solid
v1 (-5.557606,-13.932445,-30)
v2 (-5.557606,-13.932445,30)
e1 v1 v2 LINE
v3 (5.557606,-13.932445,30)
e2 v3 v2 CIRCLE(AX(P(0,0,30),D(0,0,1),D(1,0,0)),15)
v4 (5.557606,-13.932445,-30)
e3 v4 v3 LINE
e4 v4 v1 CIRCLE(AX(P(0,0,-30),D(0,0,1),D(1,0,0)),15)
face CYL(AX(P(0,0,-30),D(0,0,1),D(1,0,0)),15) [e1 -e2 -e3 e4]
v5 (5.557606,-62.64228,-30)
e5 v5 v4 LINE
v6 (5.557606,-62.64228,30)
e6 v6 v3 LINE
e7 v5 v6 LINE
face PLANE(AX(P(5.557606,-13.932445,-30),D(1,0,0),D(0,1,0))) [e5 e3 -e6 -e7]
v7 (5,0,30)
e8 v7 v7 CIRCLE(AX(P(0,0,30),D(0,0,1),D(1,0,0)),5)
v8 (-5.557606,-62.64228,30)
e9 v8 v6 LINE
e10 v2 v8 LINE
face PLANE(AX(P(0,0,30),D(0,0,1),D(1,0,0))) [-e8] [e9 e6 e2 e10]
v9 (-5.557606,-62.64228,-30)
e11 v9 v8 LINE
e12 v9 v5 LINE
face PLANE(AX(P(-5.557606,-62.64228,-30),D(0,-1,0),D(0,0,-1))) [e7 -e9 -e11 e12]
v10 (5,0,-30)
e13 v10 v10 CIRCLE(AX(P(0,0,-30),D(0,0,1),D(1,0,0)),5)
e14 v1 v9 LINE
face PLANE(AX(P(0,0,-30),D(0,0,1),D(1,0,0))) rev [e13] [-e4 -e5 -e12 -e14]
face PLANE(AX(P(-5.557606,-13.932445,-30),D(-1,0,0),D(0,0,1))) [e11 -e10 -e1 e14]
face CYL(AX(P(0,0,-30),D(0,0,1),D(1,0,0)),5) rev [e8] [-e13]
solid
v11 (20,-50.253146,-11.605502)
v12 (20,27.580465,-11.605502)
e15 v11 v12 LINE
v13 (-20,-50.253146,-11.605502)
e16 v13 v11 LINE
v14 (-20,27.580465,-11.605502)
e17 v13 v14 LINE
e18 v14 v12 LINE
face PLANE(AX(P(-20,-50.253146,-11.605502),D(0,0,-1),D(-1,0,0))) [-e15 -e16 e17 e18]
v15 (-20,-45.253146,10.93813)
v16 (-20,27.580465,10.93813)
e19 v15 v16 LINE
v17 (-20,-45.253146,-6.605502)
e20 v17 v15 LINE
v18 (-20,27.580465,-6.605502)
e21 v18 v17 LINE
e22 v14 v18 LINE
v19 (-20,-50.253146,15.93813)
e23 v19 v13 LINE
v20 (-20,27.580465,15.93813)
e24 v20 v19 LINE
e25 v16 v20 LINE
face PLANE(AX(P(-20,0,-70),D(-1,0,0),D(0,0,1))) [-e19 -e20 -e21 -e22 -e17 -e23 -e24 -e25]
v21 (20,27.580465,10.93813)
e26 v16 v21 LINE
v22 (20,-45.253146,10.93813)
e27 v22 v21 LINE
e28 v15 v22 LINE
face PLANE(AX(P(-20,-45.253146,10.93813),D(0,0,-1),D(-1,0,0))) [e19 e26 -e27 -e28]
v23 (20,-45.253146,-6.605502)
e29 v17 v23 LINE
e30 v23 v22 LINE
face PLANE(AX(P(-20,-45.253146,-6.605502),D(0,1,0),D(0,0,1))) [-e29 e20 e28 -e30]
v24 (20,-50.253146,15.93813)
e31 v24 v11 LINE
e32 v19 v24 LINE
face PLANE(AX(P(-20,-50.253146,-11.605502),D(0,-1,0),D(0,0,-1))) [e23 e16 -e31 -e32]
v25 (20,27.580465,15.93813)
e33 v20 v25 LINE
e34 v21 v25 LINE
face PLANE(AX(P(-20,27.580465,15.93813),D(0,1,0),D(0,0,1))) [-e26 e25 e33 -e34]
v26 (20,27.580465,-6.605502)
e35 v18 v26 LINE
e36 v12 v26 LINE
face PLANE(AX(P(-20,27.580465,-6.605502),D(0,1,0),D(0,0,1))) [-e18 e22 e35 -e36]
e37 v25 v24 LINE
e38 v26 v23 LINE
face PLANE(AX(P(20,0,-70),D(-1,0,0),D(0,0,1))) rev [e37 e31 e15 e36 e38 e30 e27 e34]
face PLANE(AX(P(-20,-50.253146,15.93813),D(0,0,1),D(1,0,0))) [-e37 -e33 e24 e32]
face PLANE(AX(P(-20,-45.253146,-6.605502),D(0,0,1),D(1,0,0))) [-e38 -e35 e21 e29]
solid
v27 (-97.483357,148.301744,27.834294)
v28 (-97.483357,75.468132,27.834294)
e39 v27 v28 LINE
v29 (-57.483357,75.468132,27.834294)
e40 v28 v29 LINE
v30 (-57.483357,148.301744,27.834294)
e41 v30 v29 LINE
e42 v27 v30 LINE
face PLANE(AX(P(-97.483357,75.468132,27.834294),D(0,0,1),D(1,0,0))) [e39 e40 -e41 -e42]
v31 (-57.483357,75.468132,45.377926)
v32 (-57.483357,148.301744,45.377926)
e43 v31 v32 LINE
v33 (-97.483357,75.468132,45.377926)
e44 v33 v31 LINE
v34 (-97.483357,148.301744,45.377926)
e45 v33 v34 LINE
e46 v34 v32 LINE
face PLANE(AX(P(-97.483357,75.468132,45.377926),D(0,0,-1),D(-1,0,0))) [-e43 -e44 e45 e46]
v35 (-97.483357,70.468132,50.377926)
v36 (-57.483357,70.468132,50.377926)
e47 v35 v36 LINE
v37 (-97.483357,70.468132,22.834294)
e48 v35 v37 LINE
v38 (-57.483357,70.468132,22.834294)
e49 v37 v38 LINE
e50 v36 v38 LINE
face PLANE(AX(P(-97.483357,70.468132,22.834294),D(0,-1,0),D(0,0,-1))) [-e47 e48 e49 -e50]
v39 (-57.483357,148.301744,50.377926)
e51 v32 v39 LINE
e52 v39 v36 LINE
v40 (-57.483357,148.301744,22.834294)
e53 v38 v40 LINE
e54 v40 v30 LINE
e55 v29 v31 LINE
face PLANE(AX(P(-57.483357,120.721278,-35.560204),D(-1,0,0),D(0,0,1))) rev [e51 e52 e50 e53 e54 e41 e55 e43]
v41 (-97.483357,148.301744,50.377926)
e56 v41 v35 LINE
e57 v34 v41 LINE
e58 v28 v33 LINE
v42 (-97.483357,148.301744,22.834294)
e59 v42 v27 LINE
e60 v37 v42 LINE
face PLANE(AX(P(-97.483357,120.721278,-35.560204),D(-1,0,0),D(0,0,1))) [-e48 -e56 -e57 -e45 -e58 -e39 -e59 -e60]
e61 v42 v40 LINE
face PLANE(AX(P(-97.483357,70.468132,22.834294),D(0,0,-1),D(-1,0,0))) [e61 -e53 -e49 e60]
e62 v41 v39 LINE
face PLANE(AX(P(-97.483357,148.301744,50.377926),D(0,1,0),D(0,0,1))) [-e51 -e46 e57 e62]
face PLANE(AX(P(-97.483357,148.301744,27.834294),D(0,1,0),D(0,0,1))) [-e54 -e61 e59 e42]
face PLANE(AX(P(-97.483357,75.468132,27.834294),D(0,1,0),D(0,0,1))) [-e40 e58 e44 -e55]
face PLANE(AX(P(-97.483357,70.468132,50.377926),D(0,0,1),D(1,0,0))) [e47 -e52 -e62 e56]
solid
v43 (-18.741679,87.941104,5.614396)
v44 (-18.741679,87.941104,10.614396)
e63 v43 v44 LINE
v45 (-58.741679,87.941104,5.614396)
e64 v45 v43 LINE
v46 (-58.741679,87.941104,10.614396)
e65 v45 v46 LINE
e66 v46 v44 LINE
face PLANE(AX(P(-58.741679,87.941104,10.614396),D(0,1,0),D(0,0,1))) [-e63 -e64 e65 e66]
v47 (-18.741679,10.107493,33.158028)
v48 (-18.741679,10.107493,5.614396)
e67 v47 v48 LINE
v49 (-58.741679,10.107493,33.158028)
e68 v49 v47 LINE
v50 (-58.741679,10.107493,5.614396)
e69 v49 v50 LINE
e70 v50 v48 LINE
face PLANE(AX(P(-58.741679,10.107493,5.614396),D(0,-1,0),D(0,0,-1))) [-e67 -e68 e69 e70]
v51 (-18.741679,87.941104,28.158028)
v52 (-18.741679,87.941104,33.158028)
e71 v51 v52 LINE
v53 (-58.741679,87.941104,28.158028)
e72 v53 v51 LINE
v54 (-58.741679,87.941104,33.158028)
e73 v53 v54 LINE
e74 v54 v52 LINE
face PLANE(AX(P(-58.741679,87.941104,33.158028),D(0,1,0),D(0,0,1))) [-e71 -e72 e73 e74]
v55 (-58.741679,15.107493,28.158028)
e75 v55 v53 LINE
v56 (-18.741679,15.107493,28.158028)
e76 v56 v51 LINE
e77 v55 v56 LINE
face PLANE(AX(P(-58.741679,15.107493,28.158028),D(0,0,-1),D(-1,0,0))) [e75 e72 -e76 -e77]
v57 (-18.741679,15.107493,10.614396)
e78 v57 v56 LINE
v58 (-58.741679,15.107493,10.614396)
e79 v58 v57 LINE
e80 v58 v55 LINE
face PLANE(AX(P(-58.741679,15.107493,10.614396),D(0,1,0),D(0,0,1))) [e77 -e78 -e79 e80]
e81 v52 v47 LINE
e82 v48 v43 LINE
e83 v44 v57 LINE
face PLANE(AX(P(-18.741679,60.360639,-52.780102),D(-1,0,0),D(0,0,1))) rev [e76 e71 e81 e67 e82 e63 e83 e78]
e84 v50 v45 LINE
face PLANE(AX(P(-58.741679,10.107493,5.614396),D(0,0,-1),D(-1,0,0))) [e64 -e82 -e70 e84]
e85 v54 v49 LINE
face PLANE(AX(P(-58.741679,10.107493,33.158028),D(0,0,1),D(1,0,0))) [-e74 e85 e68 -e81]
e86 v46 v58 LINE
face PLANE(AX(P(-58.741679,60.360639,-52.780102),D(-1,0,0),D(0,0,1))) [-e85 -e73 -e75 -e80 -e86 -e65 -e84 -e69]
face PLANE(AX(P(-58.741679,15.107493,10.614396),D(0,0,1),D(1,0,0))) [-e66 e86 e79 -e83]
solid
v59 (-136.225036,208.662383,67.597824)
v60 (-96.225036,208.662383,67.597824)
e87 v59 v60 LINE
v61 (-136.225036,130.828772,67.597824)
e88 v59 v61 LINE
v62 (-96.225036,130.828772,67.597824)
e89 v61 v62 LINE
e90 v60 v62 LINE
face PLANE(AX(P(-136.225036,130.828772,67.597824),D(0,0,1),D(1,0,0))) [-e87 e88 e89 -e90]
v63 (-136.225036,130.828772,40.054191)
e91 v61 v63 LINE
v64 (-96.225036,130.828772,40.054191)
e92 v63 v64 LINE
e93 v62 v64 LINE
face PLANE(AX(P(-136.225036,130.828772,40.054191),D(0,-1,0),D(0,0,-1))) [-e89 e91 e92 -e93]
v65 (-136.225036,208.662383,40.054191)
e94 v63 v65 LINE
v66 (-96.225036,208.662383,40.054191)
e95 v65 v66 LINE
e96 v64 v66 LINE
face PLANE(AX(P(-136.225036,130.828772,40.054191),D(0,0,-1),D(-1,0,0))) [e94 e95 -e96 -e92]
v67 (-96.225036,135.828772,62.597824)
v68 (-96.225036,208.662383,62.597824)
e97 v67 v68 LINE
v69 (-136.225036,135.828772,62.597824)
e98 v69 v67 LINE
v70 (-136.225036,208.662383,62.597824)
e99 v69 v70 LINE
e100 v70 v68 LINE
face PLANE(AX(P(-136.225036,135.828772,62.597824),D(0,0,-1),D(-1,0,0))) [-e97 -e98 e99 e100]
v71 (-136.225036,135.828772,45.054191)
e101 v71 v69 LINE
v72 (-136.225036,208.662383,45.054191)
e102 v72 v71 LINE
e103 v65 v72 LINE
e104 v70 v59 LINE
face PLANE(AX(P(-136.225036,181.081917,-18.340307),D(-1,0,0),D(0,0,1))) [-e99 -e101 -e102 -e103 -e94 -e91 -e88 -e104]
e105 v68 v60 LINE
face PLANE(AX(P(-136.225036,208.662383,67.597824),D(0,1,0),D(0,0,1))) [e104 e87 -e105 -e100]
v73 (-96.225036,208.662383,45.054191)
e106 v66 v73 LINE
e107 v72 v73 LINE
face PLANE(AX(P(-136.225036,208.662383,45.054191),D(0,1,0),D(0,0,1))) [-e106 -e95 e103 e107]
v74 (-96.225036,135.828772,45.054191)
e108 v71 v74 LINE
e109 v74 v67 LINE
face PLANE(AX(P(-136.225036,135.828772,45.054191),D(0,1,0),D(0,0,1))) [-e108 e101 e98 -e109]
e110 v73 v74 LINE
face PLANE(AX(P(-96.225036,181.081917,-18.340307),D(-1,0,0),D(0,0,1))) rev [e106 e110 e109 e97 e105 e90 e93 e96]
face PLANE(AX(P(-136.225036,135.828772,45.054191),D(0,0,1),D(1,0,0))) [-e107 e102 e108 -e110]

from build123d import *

# Parameters (mm, degrees)
EXTRUDE_5_DEPTH         = 30
EXTRUDE_5_DEPTH_BACK    = 30
F_1_FR_R                = 5
EXTRUDE_6_DEPTH         = 20
EXTRUDE_6_DEPTH_BACK    = 20
MOVE_START              = 130.828771523
MOVE_BODY_2_OUTLINE_W   = 40
MOVE_BODY_2_OUTLINE_H   = 5
MOVE_BODY_2_DEPTH       = 77.833611116
MOVE_BODY_2_2_OUTLINE_W = 40
MOVE_BODY_2_2_OUTLINE_H = 17.543632218
MOVE_BODY_2_2_DEPTH     = 5
MOVE_START_2            = 70.468132412
MOVE_BODY_2_3_OUTLINE_W = 40
MOVE_BODY_2_3_OUTLINE_H = 5
MOVE_BODY_2_3_DEPTH     = 77.833611116
MOVE_BODY_2_4_OUTLINE_W = 40
MOVE_BODY_2_4_OUTLINE_H = 17.543632219
MOVE_BODY_2_4_DEPTH     = 5
MOVE_START_3            = 10.107493301
MOVE_BODY_2_5_OUTLINE_W = 40
MOVE_BODY_2_5_OUTLINE_H = 5
MOVE_BODY_2_5_DEPTH     = 77.833611116
MOVE_BODY_2_6_OUTLINE_W = 40
MOVE_BODY_2_6_OUTLINE_H = 17.543632218
MOVE_BODY_2_6_DEPTH     = 5


# Read off the part's stored shape, not the designer's step: Тело-Переместить/Копировать2
with BuildPart() as part:
    # Эскиз1_fr → Бобышка-Вытянуть5 (new, two sides: drawn at the far end of the back side and taken through both)
    with BuildSketch(Plane.XY.offset(-EXTRUDE_5_DEPTH_BACK)):
        with BuildLine():
            Line((-5.557606452, -13.932444528), (-5.557606452, -62.642280008))
            Line((-5.557606452, -62.642280008), (5.557606452, -62.642280008))
            Line((5.557606452, -62.642280008), (5.557606452, -13.932444528))
            ThreePointArc((5.557606452, -13.932444528), (0, 15), (-5.557606452, -13.932444528))
        make_face()
        Circle(F_1_FR_R, mode=Mode.SUBTRACT)
    extrude(amount=EXTRUDE_5_DEPTH + EXTRUDE_5_DEPTH_BACK)


with BuildPart() as body_2:
    # Эскиз3 → Бобышка-Вытянуть6 (new, two sides: drawn at the far end of the back side and taken through both)
    with BuildSketch(Plane(origin=(0, 0, 0), x_dir=(0, 0, -1), z_dir=(1, 0, 0)).offset(-EXTRUDE_6_DEPTH_BACK)):
        Polygon((-58.394498043, -50.25314581), (-85.938130262, -50.25314581), (-85.938130262, 27.580465306), (-80.938130262, 27.580465306), (-80.938130262, -45.25314581), (-63.394498043, -45.25314581), (-63.394498043, 27.580465306), (-58.394498043, 27.580465306), align=None)
    extrude(amount=EXTRUDE_6_DEPTH + EXTRUDE_6_DEPTH_BACK)


with BuildPart() as body_2_1:
    # Move Body 1: moved
    add(body_2.part.moved(Location((0, 0, -70))))


with BuildPart() as body_3:
    # Move Body 2 outline → Move Body 2 (new body)
    with BuildSketch(Plane(origin=(0, 0, 0), x_dir=(1, 0, 0), z_dir=(0, 1, 0)).offset(MOVE_START)):
        with Locations((-116.225036109, -42.554191316)):
            Rectangle(MOVE_BODY_2_OUTLINE_W, MOVE_BODY_2_OUTLINE_H)
        with Locations((-116.225036109, -65.097823534)):
            Rectangle(MOVE_BODY_2_OUTLINE_W, MOVE_BODY_2_OUTLINE_H)
    extrude(amount=MOVE_BODY_2_DEPTH)

    # Move Body 2 2 outline → Move Body 2 2 (add)
    with BuildSketch(Plane(origin=(0, 0, 0), x_dir=(1, 0, 0), z_dir=(0, 1, 0)).offset(MOVE_START)):
        with Locations((-116.225036109, -53.826007425)):
            Rectangle(MOVE_BODY_2_2_OUTLINE_W, MOVE_BODY_2_2_OUTLINE_H)
    extrude(amount=MOVE_BODY_2_2_DEPTH)


with BuildPart() as body_4:
    # Move Body 2 3 outline → Move Body 2 3 (new body)
    with BuildSketch(Plane(origin=(0, 0, 0), x_dir=(1, 0, 0), z_dir=(0, 1, 0)).offset(MOVE_START_2)):
        with Locations((-77.483357406, -25.334293558)):
            Rectangle(MOVE_BODY_2_3_OUTLINE_W, MOVE_BODY_2_3_OUTLINE_H)
        with Locations((-77.483357406, -47.877925777)):
            Rectangle(MOVE_BODY_2_3_OUTLINE_W, MOVE_BODY_2_3_OUTLINE_H)
    extrude(amount=MOVE_BODY_2_3_DEPTH)

    # Move Body 2 4 outline → Move Body 2 4 (add)
    with BuildSketch(Plane(origin=(0, 0, 0), x_dir=(1, 0, 0), z_dir=(0, 1, 0)).offset(MOVE_START_2)):
        with Locations((-77.483357406, -36.606109668)):
            Rectangle(MOVE_BODY_2_4_OUTLINE_W, MOVE_BODY_2_4_OUTLINE_H)
    extrude(amount=MOVE_BODY_2_4_DEPTH)


with BuildPart() as body_5:
    # Move Body 2 5 outline → Move Body 2 5 (new body)
    with BuildSketch(Plane(origin=(0, 0, 0), x_dir=(1, 0, 0), z_dir=(0, 1, 0)).offset(MOVE_START_3)):
        with Locations((-38.741678703, -8.114395801)):
            Rectangle(MOVE_BODY_2_5_OUTLINE_W, MOVE_BODY_2_5_OUTLINE_H)
        with Locations((-38.741678703, -30.658028019)):
            Rectangle(MOVE_BODY_2_5_OUTLINE_W, MOVE_BODY_2_5_OUTLINE_H)
    extrude(amount=MOVE_BODY_2_5_DEPTH)

    # Move Body 2 6 outline → Move Body 2 6 (add)
    with BuildSketch(Plane(origin=(0, 0, 0), x_dir=(1, 0, 0), z_dir=(0, 1, 0)).offset(MOVE_START_3)):
        with Locations((-38.741678703, -19.38621191)):
            Rectangle(MOVE_BODY_2_6_OUTLINE_W, MOVE_BODY_2_6_OUTLINE_H)
    extrude(amount=MOVE_BODY_2_6_DEPTH)


solid = Compound([part.part, body_2_1.part, body_3.part, body_4.part, body_5.part])
